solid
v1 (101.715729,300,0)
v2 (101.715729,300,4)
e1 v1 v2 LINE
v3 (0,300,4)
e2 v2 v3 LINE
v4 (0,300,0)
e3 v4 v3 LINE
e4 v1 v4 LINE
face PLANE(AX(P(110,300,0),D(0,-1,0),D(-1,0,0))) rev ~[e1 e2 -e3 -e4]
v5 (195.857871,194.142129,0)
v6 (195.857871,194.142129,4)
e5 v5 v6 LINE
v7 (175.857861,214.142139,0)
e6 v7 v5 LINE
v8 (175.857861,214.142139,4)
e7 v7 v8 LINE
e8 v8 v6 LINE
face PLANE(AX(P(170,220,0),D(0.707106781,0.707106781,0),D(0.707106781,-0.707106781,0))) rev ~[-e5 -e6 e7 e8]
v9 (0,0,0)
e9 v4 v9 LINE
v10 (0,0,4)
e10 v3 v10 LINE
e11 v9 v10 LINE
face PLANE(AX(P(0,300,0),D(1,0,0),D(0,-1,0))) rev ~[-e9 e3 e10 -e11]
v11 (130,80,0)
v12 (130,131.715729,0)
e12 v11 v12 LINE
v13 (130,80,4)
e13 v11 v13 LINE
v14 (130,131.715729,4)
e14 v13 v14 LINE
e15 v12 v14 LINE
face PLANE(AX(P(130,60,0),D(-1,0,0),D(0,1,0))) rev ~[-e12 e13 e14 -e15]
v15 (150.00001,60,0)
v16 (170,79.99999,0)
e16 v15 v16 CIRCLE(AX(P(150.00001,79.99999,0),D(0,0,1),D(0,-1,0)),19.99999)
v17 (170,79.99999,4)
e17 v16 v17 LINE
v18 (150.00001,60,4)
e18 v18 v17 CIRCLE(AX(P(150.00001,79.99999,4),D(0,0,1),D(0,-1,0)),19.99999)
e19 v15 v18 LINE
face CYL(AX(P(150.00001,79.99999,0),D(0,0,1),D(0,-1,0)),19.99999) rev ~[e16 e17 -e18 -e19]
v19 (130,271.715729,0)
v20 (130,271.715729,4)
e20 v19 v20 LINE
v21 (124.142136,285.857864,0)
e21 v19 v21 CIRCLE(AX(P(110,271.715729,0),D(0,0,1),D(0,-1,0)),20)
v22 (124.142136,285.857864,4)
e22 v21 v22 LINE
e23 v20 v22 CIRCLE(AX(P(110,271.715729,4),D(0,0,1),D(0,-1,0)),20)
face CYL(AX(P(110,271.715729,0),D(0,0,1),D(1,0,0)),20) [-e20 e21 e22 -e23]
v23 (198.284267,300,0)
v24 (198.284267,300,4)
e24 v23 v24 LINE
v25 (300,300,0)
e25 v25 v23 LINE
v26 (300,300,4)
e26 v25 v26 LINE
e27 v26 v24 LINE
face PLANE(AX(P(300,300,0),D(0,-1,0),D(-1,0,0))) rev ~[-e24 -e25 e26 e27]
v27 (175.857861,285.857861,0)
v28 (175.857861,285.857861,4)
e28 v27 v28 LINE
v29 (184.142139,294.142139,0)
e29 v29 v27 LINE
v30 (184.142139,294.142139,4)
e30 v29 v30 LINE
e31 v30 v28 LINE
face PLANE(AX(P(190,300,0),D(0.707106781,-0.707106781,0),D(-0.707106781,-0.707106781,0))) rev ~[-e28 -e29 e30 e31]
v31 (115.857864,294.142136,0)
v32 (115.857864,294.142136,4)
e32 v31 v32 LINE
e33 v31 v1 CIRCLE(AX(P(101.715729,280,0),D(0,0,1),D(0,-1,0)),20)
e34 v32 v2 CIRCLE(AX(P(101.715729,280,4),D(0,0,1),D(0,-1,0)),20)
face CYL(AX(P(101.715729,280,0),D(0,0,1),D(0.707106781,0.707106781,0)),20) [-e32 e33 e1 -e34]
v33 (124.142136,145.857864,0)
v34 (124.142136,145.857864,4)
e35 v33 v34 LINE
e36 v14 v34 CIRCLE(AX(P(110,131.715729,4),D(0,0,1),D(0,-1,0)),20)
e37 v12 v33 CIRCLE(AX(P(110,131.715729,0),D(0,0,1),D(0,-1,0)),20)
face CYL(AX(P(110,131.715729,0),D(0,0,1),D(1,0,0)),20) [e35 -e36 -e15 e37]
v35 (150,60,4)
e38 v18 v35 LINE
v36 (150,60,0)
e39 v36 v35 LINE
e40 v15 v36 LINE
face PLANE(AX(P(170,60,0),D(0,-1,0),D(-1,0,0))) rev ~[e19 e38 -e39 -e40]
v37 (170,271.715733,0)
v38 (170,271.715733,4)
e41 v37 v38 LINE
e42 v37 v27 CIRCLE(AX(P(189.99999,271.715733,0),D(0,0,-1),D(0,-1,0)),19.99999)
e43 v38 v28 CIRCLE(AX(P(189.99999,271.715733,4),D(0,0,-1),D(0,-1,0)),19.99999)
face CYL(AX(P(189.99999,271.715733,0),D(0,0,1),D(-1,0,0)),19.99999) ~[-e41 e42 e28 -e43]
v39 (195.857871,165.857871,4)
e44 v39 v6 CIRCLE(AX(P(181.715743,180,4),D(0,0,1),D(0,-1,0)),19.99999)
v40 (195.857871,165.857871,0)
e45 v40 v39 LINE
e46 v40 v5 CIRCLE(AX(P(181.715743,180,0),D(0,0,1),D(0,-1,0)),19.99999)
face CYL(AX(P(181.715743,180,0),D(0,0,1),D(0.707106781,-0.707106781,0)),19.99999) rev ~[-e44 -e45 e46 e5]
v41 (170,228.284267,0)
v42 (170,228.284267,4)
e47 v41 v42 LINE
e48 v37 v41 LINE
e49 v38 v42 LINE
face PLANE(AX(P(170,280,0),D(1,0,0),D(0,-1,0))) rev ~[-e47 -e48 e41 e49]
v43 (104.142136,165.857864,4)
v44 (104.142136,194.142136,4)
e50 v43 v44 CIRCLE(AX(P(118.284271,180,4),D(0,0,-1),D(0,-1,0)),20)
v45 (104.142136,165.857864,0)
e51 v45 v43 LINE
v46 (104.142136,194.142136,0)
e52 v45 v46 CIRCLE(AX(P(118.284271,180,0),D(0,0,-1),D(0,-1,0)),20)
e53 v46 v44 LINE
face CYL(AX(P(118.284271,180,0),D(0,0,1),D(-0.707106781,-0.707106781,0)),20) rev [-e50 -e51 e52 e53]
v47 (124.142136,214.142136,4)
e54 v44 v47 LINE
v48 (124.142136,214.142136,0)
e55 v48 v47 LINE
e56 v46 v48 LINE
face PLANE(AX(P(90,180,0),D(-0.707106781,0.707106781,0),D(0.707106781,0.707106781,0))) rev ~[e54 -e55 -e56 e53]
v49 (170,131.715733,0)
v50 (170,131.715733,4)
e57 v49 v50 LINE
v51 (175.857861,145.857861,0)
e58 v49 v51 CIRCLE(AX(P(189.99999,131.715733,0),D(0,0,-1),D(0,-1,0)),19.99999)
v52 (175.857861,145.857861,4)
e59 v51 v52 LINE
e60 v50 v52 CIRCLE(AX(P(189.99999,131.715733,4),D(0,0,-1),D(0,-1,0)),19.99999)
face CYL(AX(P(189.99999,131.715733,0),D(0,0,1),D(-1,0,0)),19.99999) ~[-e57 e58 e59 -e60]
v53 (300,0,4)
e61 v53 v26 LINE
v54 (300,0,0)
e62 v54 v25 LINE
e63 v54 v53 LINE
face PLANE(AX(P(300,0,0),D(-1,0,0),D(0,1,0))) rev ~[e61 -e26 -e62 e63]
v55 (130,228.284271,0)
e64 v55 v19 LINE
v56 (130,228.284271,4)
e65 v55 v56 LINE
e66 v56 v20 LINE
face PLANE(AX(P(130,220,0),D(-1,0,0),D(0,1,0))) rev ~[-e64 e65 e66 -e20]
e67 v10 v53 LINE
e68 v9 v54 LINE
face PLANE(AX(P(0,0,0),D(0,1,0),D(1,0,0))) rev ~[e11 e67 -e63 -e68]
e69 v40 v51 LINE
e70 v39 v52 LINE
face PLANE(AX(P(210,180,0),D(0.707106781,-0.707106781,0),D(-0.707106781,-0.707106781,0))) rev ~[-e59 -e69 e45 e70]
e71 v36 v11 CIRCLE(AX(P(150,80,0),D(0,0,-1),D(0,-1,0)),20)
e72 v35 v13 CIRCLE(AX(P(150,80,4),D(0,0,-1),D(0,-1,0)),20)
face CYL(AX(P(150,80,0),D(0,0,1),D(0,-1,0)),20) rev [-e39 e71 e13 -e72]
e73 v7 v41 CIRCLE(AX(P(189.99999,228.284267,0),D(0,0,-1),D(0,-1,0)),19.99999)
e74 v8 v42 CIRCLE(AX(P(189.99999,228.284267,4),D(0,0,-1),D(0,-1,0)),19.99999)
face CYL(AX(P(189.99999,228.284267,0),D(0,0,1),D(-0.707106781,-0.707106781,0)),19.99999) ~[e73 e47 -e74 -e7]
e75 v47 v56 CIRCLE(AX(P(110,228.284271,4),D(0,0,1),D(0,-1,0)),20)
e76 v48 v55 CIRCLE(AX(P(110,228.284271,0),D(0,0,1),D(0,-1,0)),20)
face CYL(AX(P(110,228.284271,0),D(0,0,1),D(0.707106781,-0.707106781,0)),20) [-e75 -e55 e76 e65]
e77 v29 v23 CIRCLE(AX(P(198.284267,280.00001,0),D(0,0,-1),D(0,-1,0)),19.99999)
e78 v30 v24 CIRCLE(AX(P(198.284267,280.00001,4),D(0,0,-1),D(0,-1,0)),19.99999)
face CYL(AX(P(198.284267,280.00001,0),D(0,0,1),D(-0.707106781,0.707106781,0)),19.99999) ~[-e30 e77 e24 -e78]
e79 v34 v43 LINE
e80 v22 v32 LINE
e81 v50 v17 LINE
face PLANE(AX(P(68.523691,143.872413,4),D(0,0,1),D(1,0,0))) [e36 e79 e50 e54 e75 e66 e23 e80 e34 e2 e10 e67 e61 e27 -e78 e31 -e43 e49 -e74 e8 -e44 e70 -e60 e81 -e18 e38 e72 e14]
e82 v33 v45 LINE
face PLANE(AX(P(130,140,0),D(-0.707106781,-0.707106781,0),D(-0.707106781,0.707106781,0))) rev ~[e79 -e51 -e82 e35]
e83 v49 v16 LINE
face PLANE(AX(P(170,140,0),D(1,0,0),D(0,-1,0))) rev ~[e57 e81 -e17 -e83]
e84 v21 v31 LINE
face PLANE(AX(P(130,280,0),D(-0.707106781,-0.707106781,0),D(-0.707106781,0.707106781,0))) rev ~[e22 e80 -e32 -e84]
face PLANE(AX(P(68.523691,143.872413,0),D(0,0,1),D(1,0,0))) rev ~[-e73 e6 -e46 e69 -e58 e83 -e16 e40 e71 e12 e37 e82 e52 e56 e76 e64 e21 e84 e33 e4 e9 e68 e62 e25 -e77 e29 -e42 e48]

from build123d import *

# Parameters (mm, degrees)
F1_DEPTH = 4
F2_R     = 20
F3_R     = 19.99999


# Not quite as in the source:
# - a fillet or chamfer is up to 0.001 mm smaller than in the source, because OpenCascade refuses the exact size


with BuildPart() as f1:
    # F0 (on Top) → F1 (new body)
    with BuildSketch(Plane.XY):
        Polygon((0, 300), (0, 0), (150, 0), (150, 60), (130, 60), (130, 140), (90, 180), (130, 220), (130, 280), (110, 300), align=None)
        Polygon((150, 60), (150, 0), (300, 0), (300, 300), (190, 300), (170, 280), (170, 220), (210, 180), (170, 140), (170, 60), align=None)
    extrude(amount=F1_DEPTH)

    # F2
    f2_edges = [f1.edges().sort_by_distance(p)[0] for p in [
        (130, 60, 2),
        (130, 140, 2),
        (90, 180, 2),
        (130, 220, 2),
        (130, 280, 2),
        (110, 300, 2),
    ]]
    fillet(f2_edges, radius=F2_R)

    # F3 (radius 20 in the source; OpenCascade refuses exactly that, so slightly less here)
    f3_edges = [f1.edges().sort_by_distance(p)[0] for p in [
        (190, 300, 2),
        (170, 280, 2),
        (170, 220, 2),
        (210, 180, 2),
        (170, 140, 2),
        (170, 60, 2),
    ]]
    fillet(f3_edges, radius=F3_R)


solid = f1.part
